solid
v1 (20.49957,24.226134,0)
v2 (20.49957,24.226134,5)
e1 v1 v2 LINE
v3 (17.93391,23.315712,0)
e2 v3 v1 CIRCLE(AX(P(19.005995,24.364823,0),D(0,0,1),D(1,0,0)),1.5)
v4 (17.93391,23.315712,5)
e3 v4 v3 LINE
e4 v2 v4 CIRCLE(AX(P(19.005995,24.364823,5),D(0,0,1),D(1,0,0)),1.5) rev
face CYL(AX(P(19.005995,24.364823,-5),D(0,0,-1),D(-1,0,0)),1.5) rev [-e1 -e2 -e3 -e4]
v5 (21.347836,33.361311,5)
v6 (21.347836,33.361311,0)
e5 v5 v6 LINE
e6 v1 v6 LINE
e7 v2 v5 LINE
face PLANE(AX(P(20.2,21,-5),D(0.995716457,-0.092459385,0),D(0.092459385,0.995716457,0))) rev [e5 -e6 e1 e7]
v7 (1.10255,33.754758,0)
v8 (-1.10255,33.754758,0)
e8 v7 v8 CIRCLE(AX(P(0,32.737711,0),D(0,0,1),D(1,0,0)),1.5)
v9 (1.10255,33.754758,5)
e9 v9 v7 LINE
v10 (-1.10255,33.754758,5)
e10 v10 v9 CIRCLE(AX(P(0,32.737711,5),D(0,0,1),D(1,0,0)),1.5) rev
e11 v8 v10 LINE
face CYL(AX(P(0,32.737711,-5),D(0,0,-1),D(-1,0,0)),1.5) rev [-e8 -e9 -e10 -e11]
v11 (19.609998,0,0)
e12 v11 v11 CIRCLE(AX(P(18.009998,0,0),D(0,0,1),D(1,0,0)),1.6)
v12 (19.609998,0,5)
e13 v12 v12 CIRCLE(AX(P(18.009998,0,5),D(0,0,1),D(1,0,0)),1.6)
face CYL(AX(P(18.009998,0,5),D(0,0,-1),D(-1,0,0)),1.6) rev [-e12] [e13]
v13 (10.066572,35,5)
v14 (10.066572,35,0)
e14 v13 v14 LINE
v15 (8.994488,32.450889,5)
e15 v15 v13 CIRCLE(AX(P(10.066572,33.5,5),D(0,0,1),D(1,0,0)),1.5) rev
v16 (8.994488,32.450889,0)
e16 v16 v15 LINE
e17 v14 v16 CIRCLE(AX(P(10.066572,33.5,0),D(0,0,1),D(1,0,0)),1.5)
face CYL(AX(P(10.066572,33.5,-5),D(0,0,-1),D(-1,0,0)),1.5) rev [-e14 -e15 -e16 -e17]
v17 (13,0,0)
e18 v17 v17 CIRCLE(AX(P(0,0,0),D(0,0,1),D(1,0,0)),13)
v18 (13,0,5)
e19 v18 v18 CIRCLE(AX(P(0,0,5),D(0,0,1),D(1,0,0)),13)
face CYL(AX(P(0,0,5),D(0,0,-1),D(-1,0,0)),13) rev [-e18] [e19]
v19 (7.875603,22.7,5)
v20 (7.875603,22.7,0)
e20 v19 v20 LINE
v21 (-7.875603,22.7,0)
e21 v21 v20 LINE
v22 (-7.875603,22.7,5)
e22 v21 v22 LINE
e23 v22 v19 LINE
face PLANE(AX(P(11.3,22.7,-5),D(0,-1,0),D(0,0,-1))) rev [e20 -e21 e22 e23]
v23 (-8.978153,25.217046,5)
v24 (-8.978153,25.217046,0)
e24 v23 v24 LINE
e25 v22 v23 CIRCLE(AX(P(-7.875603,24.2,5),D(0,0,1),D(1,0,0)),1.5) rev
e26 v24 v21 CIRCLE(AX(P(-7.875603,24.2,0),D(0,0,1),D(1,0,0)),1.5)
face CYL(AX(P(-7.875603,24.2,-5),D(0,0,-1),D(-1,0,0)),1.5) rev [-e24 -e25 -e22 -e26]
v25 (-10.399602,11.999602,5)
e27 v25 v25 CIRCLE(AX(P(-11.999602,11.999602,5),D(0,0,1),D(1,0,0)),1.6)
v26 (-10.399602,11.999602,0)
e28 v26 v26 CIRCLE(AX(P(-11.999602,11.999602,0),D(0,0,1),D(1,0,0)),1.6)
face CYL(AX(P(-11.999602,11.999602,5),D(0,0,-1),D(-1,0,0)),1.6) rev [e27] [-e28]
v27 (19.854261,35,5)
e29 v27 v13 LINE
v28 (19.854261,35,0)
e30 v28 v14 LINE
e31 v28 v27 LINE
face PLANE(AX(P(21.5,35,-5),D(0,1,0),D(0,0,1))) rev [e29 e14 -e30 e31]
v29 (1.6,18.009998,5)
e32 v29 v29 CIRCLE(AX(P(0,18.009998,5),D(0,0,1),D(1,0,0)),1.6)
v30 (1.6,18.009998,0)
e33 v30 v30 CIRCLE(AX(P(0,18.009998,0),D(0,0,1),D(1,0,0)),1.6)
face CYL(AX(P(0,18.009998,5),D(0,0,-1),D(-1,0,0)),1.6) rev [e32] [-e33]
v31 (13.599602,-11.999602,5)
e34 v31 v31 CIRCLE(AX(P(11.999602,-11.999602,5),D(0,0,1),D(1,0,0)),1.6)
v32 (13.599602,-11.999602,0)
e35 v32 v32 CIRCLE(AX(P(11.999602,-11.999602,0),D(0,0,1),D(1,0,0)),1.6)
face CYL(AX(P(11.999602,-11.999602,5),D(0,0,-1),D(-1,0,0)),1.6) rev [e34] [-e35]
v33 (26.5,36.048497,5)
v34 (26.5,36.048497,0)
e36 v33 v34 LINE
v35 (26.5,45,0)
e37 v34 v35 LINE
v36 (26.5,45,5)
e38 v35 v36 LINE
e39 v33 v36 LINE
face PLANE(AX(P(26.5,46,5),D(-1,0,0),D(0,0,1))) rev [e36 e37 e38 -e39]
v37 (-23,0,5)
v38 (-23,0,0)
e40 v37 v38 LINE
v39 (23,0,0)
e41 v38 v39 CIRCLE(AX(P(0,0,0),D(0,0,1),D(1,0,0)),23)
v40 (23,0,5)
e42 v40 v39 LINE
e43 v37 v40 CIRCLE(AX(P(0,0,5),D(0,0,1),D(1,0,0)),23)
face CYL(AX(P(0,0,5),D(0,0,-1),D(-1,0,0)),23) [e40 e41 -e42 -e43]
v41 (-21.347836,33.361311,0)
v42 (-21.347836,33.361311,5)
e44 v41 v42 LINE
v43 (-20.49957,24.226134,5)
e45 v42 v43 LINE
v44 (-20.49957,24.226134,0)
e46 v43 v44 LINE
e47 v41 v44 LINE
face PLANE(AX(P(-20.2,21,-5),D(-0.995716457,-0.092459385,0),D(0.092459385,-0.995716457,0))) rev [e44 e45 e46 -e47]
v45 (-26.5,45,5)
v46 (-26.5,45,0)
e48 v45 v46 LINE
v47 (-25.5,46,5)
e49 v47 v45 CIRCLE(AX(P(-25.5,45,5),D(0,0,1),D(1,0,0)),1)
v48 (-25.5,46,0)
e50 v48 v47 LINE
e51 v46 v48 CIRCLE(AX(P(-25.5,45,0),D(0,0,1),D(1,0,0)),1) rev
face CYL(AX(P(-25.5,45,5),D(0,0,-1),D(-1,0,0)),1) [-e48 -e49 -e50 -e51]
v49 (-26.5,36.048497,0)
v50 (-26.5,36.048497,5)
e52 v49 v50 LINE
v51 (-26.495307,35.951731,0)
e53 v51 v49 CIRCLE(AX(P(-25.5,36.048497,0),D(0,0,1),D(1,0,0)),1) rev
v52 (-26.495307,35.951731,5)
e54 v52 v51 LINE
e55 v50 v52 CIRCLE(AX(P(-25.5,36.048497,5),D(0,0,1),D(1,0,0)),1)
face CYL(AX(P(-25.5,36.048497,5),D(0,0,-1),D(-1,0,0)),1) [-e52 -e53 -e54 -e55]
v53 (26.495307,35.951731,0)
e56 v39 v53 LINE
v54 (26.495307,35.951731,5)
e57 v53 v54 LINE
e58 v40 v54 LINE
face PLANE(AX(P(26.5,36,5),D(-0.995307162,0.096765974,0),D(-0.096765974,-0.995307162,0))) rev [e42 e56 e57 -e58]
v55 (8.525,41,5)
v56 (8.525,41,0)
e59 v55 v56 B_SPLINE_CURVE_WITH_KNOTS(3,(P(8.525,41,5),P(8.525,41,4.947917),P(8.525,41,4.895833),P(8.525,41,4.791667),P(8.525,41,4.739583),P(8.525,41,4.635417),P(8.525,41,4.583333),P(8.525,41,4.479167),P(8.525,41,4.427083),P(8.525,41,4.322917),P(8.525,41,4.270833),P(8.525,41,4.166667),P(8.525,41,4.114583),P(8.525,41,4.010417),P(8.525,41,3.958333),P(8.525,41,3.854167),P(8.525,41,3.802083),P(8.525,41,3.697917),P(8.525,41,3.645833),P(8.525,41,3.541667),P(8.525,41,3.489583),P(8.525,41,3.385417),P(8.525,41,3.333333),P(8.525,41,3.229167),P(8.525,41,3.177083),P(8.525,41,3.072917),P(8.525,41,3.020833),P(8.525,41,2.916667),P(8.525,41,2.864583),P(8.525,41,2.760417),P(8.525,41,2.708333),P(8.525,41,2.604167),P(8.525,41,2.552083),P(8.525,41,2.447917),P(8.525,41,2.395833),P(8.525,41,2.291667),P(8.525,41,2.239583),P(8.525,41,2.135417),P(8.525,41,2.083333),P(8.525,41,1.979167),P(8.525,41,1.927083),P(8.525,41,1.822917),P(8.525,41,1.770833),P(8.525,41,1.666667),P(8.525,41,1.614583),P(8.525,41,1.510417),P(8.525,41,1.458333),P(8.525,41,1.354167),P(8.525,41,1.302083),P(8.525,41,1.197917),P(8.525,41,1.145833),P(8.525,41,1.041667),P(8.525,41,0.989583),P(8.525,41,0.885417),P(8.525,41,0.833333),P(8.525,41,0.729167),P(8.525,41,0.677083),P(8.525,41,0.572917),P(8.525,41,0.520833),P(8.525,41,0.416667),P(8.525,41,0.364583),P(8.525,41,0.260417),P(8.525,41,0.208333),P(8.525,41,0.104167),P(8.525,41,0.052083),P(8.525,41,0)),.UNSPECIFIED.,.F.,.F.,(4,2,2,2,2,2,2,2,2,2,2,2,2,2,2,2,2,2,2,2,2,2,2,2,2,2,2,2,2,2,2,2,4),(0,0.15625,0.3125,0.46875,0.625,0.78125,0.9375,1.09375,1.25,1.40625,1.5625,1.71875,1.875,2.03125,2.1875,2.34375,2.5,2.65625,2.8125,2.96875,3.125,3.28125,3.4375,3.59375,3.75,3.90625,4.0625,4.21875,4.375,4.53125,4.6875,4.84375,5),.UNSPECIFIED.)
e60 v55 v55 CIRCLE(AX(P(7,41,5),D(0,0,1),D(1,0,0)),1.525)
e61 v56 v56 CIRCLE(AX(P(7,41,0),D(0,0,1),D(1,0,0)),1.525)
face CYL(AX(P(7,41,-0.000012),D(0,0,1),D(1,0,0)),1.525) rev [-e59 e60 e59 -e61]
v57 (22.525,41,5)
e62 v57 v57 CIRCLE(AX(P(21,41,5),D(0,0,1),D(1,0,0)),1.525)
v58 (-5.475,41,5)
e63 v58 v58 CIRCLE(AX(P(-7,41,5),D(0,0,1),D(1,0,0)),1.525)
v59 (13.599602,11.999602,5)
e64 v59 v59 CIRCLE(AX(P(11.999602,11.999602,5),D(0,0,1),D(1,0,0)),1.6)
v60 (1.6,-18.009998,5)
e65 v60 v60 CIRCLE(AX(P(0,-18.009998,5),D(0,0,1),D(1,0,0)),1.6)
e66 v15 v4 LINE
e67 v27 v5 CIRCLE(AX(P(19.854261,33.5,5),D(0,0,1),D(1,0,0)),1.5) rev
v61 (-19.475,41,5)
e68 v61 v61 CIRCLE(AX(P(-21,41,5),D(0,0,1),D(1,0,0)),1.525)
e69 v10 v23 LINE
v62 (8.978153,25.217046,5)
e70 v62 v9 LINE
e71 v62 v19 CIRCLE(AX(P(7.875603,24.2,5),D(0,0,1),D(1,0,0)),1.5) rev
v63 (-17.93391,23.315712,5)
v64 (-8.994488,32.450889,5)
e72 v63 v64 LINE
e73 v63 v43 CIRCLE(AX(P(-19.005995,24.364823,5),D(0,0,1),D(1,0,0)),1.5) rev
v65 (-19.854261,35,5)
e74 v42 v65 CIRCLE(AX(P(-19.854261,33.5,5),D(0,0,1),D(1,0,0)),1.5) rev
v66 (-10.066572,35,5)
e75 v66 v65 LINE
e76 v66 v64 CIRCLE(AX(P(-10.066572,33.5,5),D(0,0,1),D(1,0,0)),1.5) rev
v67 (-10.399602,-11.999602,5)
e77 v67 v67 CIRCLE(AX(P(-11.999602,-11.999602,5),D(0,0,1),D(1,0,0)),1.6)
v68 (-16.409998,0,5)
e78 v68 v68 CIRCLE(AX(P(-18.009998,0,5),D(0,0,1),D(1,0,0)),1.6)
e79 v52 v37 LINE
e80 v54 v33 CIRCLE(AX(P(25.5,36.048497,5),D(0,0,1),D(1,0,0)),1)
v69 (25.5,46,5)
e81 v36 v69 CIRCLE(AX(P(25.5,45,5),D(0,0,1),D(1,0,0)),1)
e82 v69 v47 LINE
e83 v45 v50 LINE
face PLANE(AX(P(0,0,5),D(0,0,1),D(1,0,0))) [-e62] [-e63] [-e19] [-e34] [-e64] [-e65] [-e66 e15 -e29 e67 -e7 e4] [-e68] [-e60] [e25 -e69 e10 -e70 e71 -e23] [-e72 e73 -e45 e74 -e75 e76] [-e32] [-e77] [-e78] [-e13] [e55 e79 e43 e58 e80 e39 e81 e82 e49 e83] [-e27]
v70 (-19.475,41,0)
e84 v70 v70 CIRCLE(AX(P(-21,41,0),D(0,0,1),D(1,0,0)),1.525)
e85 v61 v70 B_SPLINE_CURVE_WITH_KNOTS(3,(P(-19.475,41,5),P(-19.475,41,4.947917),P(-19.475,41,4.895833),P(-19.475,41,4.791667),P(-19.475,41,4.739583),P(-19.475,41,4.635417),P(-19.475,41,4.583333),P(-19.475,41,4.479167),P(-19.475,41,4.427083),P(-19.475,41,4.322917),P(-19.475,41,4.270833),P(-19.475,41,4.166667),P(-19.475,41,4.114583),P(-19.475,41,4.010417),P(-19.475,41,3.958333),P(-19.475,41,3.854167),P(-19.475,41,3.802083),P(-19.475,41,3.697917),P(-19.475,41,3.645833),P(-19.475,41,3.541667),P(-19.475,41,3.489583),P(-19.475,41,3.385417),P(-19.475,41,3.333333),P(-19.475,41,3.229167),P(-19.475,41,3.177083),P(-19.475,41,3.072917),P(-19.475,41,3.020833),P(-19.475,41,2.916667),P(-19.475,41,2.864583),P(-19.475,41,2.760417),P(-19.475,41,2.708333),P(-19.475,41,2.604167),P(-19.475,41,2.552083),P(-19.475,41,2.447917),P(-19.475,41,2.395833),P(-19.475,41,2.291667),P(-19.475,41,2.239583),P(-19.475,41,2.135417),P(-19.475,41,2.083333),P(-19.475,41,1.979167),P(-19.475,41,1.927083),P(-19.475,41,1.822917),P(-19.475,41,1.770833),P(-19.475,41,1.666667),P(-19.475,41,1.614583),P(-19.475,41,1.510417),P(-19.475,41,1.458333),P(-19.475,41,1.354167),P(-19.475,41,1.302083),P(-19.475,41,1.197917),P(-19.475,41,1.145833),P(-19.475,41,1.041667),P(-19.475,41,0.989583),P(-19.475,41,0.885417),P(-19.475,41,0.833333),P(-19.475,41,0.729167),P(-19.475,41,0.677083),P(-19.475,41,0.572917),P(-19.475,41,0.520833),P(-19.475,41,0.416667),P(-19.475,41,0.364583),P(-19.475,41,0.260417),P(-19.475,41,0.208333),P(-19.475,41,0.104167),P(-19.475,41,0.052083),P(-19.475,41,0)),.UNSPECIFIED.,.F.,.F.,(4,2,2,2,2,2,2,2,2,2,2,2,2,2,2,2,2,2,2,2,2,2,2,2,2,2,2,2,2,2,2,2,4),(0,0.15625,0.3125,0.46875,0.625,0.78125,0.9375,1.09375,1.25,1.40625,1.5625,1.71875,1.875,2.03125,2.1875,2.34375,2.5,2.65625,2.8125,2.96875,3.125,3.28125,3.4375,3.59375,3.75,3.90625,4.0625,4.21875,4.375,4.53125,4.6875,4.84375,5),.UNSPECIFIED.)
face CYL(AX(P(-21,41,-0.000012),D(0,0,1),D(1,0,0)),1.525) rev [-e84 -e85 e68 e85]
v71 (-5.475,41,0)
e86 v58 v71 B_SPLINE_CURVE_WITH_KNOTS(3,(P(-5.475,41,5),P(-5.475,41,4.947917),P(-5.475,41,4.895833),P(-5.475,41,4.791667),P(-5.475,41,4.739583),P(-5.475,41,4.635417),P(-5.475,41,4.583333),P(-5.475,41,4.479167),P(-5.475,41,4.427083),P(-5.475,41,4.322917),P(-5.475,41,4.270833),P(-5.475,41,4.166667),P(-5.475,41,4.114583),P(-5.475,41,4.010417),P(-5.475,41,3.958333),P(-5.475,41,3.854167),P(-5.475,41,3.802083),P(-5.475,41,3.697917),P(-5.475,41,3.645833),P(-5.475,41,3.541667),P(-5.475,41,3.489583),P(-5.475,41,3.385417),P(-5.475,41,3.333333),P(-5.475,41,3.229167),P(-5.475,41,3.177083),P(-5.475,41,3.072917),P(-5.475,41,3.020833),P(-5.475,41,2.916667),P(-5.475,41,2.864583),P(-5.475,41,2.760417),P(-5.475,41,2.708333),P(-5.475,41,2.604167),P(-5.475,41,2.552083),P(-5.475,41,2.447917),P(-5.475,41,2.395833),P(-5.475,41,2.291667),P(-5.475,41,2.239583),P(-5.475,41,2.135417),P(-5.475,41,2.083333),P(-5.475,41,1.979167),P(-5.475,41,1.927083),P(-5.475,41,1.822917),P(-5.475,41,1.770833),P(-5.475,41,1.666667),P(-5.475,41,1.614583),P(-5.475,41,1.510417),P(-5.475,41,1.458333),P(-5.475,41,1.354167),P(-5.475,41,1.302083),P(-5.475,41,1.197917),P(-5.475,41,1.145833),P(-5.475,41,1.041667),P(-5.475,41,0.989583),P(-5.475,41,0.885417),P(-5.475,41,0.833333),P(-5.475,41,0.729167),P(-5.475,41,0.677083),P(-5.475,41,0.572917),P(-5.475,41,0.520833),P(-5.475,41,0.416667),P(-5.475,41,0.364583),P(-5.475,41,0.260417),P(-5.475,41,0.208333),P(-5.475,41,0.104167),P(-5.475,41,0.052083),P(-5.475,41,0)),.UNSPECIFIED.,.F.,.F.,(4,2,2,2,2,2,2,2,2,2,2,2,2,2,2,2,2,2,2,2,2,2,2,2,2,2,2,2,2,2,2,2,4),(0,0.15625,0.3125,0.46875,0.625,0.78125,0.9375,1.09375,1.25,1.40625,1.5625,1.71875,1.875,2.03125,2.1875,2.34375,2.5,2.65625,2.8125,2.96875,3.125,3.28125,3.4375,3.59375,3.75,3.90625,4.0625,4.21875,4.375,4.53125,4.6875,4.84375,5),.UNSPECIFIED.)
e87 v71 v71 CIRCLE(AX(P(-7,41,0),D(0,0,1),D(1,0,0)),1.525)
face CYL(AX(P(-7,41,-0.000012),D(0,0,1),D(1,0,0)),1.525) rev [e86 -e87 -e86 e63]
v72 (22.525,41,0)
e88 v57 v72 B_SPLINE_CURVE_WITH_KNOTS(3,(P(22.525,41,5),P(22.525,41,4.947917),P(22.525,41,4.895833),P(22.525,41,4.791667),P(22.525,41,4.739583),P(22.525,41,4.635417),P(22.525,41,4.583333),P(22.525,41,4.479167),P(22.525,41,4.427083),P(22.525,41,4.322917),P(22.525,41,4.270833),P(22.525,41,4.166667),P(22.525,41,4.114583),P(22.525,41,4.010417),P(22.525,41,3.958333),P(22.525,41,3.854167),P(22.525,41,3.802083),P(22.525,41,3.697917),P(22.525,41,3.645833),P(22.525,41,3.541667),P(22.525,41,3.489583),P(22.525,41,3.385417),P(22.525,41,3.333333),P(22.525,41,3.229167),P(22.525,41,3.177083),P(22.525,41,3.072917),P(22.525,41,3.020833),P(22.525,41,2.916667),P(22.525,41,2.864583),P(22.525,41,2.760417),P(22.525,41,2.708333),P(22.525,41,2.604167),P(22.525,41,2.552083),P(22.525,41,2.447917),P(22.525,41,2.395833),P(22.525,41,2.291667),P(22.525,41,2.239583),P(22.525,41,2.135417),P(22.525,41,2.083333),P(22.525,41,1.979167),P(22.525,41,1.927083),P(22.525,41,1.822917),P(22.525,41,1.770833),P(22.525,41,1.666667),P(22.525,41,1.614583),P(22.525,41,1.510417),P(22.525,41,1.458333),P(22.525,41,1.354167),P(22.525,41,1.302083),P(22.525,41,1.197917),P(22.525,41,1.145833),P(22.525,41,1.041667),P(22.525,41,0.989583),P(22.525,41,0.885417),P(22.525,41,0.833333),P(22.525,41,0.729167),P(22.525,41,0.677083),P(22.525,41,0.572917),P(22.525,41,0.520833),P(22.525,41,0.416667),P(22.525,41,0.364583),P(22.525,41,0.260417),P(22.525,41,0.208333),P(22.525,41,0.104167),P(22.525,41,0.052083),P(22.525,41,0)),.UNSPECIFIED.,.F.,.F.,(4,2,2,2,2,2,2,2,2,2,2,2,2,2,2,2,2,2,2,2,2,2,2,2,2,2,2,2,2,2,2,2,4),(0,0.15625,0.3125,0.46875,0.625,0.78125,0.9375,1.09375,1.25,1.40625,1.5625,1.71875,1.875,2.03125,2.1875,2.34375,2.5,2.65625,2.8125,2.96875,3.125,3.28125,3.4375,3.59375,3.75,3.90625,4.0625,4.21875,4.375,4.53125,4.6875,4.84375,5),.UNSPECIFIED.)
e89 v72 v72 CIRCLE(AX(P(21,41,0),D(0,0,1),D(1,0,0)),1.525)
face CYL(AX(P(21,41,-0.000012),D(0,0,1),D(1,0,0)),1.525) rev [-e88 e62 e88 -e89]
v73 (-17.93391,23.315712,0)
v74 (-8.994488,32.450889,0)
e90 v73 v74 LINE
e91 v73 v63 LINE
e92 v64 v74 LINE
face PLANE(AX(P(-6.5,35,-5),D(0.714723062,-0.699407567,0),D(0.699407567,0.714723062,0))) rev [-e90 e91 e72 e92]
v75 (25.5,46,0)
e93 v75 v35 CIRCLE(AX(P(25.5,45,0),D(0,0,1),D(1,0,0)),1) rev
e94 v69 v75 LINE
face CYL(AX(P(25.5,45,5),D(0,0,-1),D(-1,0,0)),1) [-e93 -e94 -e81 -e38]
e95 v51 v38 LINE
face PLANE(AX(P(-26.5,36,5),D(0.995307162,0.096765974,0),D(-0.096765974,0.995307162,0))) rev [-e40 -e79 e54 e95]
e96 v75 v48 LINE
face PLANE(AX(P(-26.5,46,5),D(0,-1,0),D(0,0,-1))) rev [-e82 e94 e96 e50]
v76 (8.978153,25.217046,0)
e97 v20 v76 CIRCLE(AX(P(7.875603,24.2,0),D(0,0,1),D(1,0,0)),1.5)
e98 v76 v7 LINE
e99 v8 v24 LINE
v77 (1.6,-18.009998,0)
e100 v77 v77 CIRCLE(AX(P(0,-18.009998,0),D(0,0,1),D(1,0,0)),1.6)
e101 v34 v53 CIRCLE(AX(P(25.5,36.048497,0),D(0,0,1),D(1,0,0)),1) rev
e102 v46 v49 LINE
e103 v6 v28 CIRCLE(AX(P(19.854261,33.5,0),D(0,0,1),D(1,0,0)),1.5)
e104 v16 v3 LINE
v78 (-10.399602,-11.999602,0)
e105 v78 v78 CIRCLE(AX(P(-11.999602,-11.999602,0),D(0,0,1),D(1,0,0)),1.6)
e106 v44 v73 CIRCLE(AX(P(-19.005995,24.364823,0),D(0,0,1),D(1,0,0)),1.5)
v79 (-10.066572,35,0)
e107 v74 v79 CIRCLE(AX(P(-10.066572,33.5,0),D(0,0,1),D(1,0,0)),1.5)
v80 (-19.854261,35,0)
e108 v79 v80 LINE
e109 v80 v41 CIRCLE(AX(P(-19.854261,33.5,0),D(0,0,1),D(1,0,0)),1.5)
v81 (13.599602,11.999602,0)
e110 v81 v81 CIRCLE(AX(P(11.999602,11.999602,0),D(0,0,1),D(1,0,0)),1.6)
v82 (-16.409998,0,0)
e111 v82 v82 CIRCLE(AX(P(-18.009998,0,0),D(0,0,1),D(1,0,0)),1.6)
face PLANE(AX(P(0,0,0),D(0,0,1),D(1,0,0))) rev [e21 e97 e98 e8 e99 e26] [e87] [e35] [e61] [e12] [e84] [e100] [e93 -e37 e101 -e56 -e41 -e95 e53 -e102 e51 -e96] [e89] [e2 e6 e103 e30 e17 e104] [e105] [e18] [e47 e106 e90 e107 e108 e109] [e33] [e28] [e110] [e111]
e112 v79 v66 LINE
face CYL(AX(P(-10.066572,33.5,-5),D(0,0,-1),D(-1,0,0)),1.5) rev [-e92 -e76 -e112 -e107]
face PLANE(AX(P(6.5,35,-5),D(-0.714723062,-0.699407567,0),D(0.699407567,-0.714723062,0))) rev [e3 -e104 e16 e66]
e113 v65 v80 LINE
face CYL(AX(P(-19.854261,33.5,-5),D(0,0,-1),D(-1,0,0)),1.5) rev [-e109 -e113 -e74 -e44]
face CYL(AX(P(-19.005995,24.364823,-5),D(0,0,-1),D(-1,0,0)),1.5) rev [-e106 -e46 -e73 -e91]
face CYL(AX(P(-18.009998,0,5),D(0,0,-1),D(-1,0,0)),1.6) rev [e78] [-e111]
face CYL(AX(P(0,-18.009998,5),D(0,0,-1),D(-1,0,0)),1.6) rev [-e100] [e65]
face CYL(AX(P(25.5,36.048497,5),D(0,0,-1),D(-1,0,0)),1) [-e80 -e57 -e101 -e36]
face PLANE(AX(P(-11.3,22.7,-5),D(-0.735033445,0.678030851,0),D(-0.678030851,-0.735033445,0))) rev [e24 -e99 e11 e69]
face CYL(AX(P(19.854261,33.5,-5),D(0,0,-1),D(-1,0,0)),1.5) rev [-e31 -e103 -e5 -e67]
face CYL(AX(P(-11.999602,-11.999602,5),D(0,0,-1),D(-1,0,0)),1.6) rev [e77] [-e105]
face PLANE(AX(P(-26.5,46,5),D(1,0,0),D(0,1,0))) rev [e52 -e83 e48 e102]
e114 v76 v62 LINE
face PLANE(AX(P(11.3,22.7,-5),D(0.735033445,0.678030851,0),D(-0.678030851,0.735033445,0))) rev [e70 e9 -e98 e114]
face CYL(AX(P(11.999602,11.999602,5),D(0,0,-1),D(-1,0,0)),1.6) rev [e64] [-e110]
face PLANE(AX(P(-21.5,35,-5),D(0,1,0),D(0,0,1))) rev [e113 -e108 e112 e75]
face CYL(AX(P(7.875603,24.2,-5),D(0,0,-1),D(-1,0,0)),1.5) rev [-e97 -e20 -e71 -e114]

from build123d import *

# Parameters (mm, degrees)
EXTRUDE_2_DEPTH          = 5
FILLET_3_R               = 1
SKETCH_3_R               = 13
SKETCH_3_R_2             = 1.6
CUT_EXTRUDE_5_DEPTH      = 5
CUT_EXTRUDE_6_DEPTH      = 54.322134241
CUT_EXTRUDE_6_DEPTH_BACK = 54.322134241
SKETCH_4_R               = 1.525
CUT_EXTRUDE_7_DEPTH      = 10
FILLET_4_R               = 1.5


with BuildPart() as part:
    # 草圖2 → 填料-伸長2 (new body)
    with BuildSketch(Plane.XY):
        with BuildLine():
            Line((-26.5, 46), (26.5, 46))
            Line((26.5, 46), (26.5, 36))
            Line((26.5, 36), (23, 0))
            ThreePointArc((23, 0), (0, -23), (-23, 0))
            Line((-23, 0), (-26.5, 36))
            Line((-26.5, 36), (-26.5, 46))
        make_face()
    extrude(amount=EXTRUDE_2_DEPTH)

    # 圓角3
    # the kernel refuses this fillet: 1 mm, written as the material it takes off along each edge
    with BuildSketch(Plane(origin=(-26.5, 46, -2.5), x_dir=(0, -1, 0), z_dir=(0, 0, 1)), Plane(origin=(26.5, 46, -2.5), x_dir=(-1, 0, 0), z_dir=(0, 0, 1))) as fillet_3_piece_1:
        with BuildLine():
            CenterArc((FILLET_3_R, FILLET_3_R), FILLET_3_R, 180, 90)
            Line((0, FILLET_3_R), (0, 0))
            Line((0, 0), (FILLET_3_R, 0))
        make_face()
    extrude(amount=10, mode=Mode.SUBTRACT)
    with BuildSketch(Plane(origin=(26.5, 36, -0.121241952), x_dir=(0, 1, 0), z_dir=(0, 0, 1)), Plane(origin=(-26.5, 36, -0.121241952), x_dir=(0.0967659740606196, -0.9953071617667079, 0), z_dir=(0, 0, 1))) as fillet_3_piece_2:
        with BuildLine():
            CenterArc((FILLET_3_R * 0.0484967808039, FILLET_3_R), FILLET_3_R, 264.447028967, 5.552971033)
            Line((-FILLET_3_R * 0.0482691932568, FILLET_3_R * 0.0046928382333), (0, 0))
            Line((0, 0), (FILLET_3_R * 0.0484967808039, 0))
        make_face()
    extrude(amount=5.242483904, mode=Mode.SUBTRACT)

    # 草圖3 → 除料-伸長5 (cut)
    with BuildSketch(Plane.XY):
        Circle(SKETCH_3_R)
        with Locations((18.009998301, 0)):
            Circle(SKETCH_3_R_2)
        with Locations((0, -18.009998301)):
            Circle(SKETCH_3_R_2)
        with Locations((-18.009998301, 0)):
            Circle(SKETCH_3_R_2)
        with Locations((0, 18.009998301)):
            Circle(SKETCH_3_R_2)
        with Locations((11.999602077, 11.999602077)):
            Circle(SKETCH_3_R_2)
        with Locations((11.999602077, -11.999602077)):
            Circle(SKETCH_3_R_2)
        with Locations((-11.999602077, -11.999602077)):
            Circle(SKETCH_3_R_2)
        with Locations((-11.999602077, 11.999602077)):
            Circle(SKETCH_3_R_2)
    extrude(amount=CUT_EXTRUDE_5_DEPTH, mode=Mode.SUBTRACT)

    # 草圖4 → 除料-伸長6 (cut, two sides: drawn at the far end of the back side and taken through both)
    with BuildSketch(Plane.XY.offset(-CUT_EXTRUDE_6_DEPTH_BACK)):
        with Locations((21, 41)):
            Circle(SKETCH_4_R)
        with Locations((7, 41)):
            Circle(SKETCH_4_R)
        with Locations((-7, 41)):
            Circle(SKETCH_4_R)
        with Locations((-21, 41)):
            Circle(SKETCH_4_R)
    extrude(amount=CUT_EXTRUDE_6_DEPTH + CUT_EXTRUDE_6_DEPTH_BACK, mode=Mode.SUBTRACT)

    # 草圖5 → 除料-伸長7 (cut)
    with BuildSketch(Plane.XY.offset(5)):
        Polygon((-21.5, 35), (-6.5, 35), (-20.2, 21), align=None)
        Polygon((11.3, 22.7), (-11.3, 22.7), (0, 34.95), align=None)
        Polygon((6.5, 35), (20.2, 21), (21.5, 35), align=None)
    extrude(amount=-CUT_EXTRUDE_7_DEPTH, mode=Mode.SUBTRACT)

    # 圓角4
    fillet_4_edges = [part.edges().sort_by_distance(p)[0] for p in [
        (6.5, 35, 2.5),
        (21.5, 35, 2.5),
        (20.2, 21, 2.5),
        (-11.3, 22.7, 2.5),
        (0, 34.95, 2.5),
        (11.3, 22.7, 2.5),
        (-20.2, 21, 2.5),
        (-21.5, 35, 2.5),
        (-6.5, 35, 2.5),
    ]]
    fillet(fillet_4_edges, radius=FILLET_4_R)


solid = part.part
